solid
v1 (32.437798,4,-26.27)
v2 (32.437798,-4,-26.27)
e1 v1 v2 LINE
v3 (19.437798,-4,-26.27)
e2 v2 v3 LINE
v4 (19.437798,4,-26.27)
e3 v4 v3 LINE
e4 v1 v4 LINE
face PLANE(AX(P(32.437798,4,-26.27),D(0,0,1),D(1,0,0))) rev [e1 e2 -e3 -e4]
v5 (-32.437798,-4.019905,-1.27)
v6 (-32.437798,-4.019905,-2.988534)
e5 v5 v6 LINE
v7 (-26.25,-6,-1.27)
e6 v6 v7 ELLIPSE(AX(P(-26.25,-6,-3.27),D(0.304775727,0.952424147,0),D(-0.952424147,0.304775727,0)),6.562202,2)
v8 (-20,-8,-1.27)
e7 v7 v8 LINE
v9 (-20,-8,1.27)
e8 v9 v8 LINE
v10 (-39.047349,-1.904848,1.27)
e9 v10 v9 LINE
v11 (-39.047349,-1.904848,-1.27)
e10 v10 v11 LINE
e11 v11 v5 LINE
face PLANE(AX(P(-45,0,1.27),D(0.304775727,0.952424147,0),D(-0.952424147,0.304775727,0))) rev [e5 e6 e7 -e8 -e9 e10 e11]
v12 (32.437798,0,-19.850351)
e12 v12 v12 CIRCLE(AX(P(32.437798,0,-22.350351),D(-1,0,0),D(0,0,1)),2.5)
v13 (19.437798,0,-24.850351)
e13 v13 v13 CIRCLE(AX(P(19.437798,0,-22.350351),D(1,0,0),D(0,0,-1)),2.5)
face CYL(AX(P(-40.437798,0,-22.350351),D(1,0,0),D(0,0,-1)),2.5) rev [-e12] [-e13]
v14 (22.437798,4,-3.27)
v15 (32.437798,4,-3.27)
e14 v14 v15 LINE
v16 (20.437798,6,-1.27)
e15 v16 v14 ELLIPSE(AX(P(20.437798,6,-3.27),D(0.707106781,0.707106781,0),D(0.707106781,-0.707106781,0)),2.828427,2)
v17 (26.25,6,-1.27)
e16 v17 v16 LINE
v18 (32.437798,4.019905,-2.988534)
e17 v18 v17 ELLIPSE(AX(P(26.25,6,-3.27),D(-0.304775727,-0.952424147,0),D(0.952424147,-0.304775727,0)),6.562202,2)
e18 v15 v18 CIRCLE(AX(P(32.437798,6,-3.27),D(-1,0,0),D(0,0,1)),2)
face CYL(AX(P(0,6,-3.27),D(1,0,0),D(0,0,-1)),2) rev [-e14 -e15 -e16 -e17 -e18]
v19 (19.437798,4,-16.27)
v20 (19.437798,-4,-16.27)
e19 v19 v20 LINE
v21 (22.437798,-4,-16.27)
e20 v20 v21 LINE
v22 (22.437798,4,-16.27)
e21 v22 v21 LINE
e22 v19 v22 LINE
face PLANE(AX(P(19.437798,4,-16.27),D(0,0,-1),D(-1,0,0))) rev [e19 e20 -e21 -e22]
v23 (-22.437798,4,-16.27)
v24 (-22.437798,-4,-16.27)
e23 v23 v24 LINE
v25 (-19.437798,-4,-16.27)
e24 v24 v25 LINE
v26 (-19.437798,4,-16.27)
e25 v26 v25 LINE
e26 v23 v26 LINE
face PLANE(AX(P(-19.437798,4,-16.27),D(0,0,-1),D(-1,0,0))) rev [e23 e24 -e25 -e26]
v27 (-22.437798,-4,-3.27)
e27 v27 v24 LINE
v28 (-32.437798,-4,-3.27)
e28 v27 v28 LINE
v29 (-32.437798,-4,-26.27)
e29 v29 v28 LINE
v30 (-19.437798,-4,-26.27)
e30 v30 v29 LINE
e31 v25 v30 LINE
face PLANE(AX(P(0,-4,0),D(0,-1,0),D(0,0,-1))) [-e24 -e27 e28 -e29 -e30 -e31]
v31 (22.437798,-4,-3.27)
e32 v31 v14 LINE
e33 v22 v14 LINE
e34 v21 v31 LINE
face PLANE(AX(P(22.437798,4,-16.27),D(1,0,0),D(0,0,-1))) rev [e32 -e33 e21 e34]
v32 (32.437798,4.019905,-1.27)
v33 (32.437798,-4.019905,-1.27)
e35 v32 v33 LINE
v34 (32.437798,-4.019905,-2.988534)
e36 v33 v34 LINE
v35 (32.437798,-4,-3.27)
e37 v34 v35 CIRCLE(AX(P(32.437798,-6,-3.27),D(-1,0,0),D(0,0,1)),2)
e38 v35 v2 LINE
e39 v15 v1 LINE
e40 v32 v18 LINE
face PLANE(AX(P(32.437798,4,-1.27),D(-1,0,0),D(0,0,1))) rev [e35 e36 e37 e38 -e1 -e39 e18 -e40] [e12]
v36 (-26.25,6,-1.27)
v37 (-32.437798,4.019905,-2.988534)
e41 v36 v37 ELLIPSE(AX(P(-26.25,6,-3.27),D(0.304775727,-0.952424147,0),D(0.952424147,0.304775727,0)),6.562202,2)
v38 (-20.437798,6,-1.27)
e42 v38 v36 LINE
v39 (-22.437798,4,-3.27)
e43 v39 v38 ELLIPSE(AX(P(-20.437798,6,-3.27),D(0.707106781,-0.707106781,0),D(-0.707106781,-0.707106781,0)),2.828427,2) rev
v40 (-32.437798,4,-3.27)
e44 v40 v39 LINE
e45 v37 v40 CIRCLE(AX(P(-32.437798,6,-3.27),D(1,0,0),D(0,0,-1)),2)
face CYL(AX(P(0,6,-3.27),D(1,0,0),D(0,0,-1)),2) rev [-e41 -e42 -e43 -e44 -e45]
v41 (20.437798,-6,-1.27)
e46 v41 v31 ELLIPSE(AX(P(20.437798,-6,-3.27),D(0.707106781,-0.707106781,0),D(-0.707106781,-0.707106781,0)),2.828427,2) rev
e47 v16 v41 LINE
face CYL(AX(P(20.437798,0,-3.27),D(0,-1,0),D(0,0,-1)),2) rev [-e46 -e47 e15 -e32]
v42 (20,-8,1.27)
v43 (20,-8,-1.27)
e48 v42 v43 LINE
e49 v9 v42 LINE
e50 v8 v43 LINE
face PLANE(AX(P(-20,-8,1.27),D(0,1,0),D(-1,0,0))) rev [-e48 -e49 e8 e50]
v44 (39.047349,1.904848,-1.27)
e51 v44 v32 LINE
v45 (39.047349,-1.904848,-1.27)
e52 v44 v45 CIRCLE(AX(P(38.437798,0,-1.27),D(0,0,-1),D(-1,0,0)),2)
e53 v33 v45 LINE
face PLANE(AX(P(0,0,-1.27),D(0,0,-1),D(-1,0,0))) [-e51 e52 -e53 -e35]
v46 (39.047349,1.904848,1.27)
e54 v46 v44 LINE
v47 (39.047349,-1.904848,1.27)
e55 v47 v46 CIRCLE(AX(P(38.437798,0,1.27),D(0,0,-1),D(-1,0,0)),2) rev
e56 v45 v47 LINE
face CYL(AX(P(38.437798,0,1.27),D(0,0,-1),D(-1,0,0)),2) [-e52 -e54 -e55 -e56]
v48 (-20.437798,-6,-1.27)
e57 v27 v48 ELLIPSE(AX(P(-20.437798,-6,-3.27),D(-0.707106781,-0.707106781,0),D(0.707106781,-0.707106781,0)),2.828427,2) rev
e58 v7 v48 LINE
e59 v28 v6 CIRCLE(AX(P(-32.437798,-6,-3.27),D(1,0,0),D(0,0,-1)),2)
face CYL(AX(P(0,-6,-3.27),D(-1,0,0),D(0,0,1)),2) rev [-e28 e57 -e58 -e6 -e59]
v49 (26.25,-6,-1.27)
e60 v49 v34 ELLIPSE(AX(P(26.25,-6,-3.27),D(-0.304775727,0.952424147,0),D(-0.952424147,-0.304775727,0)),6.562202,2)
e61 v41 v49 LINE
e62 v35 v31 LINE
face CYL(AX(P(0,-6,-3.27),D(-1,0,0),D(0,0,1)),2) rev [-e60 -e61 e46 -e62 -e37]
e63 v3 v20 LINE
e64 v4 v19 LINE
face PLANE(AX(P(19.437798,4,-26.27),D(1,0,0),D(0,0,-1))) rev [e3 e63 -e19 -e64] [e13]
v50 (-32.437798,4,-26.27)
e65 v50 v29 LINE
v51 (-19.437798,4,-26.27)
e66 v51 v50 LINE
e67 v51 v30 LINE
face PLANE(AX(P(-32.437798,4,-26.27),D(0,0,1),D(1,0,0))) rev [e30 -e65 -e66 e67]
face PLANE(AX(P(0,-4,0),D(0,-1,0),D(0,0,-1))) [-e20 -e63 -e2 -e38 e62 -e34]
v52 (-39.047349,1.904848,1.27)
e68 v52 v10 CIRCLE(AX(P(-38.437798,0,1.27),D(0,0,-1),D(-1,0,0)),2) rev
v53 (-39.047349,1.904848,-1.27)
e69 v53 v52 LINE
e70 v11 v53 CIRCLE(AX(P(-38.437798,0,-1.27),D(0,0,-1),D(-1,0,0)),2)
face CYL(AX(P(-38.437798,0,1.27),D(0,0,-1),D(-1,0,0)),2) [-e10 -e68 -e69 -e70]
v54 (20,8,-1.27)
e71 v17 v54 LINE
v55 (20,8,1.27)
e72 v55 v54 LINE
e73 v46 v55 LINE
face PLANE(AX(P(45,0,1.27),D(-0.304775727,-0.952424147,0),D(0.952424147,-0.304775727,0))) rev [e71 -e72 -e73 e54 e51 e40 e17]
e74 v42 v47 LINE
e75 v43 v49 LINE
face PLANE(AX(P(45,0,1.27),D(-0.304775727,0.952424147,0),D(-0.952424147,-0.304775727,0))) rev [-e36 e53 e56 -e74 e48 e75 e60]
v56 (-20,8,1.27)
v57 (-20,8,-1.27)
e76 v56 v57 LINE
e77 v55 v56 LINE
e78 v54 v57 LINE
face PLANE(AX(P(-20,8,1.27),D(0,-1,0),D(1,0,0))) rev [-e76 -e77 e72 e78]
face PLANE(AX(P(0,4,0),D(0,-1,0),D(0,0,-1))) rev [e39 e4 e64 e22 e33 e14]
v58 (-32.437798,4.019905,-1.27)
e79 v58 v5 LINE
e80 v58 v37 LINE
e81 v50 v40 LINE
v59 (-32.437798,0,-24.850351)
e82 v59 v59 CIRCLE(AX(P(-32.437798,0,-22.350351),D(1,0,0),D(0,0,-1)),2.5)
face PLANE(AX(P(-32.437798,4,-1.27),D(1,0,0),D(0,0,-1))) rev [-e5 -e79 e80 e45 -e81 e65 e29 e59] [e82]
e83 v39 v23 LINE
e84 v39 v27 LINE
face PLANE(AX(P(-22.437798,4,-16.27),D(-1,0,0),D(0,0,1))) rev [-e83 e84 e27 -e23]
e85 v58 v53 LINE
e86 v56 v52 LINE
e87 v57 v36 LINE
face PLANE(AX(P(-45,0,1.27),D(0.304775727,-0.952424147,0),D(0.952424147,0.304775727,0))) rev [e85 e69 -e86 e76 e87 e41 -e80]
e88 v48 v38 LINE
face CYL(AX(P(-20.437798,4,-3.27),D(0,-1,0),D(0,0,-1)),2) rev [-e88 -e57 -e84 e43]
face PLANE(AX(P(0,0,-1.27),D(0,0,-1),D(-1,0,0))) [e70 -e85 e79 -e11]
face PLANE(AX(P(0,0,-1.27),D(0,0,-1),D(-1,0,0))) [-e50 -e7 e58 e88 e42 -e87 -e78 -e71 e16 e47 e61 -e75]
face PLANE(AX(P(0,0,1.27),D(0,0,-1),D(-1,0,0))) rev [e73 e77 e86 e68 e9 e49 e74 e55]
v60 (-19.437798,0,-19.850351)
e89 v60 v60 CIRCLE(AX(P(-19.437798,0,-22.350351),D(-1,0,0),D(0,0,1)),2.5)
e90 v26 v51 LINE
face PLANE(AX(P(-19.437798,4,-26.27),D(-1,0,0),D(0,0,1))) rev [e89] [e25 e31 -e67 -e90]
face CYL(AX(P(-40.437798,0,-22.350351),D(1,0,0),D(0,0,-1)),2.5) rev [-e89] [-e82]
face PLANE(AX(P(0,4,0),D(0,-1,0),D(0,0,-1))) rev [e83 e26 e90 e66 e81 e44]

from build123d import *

# Parameters (mm, degrees)
BOSS_EXTRUDE1_DEPTH     = 1.27
FILLET1_R               = 2
BOSS_EXTRUDE2_DEPTH     = 4
CUT_EXTRUDE1_DEPTH      = 49.880756713
CUT_EXTRUDE1_DEPTH_BACK = 49.880756713
SKETCH3_R               = 2.5
FILLET2_R               = 2


with BuildPart() as part:
    # Sketch1 → Boss-Extrude1 (new, symmetric)
    with BuildSketch(Plane.XY):
        Polygon((-45, 0), (-20, 8), (20, 8), (45, 0), (20, -8), (-20, -8), align=None)
    extrude(amount=BOSS_EXTRUDE1_DEPTH, both=True)

    # Fillet1
    fillet1_edges = [part.edges().sort_by_distance(p)[0] for p in [
        (-45, 0, 0),
        (45, 0, 0),
    ]]
    fillet(fillet1_edges, radius=FILLET1_R)

    # Sketch2 → Boss-Extrude2 (add, symmetric)
    with BuildSketch(Plane(origin=(0, 0, 0), x_dir=(1, 0, 0), z_dir=(0, 1, 0))):
        Polygon((-32.437797626, 1.27), (-32.437797626, 26.27), (-19.437797626, 26.27), (-19.437797626, 16.27), (-22.437797626, 16.27), (-22.437797626, 1.27), align=None)
        Polygon((22.437797626, 16.27), (22.437797626, 1.27), (32.437797626, 1.27), (32.437797626, 26.27), (19.437797626, 26.27), (19.437797626, 16.27), align=None)
    extrude(amount=BOSS_EXTRUDE2_DEPTH, both=True)

    # Sketch3 → Cut-Extrude1 (cut, two sides: drawn at the far end of the back side and taken through both)
    with BuildSketch(Plane(origin=(0, 0, 0), x_dir=(0, 0, -1), z_dir=(1, 0, 0)).offset(-CUT_EXTRUDE1_DEPTH_BACK)):
        with Locations((22.350351111, 0)):
            Circle(SKETCH3_R)
    extrude(amount=CUT_EXTRUDE1_DEPTH + CUT_EXTRUDE1_DEPTH_BACK, mode=Mode.SUBTRACT)

    # Fillet2
    # the kernel refuses this fillet: 2 mm, written as the material it adds along each edge
    with BuildSketch(Plane(origin=(-22.437797626, -4, -1.27), x_dir=(0, -1, 0), z_dir=(-1, 0, 0))) as fillet2_piece_1_section:
        with BuildLine():
            CenterArc((FILLET2_R, -FILLET2_R), FILLET2_R, 90, 90)
            Line((0, -FILLET2_R), (0, 0))
            Line((0, 0), (FILLET2_R, 0))
        make_face()
    fillet2_piece_1 = extrude(amount=10, mode=Mode.PRIVATE)
    fillet2_piece_1 = split(fillet2_piece_1, bisect_by=Plane(origin=(-27.271019309, -5.673273821, -1.76186219), z_dir=(0.3047757271037839, 0.9524241471993241, 0)), keep=Keep.TOP, mode=Mode.PRIVATE)
    add(fillet2_piece_1)
    with BuildSketch(Plane(origin=(-22.437797626, -4, -1.27), x_dir=(1, 0, 0), z_dir=(0, 1, 0))) as fillet2_piece_2:
        with BuildLine():
            CenterArc((FILLET2_R, FILLET2_R), FILLET2_R, 180, 90)
            Line((0, FILLET2_R), (0, 0))
            Line((0, 0), (FILLET2_R, 0))
        make_face()
    extrude(amount=8)
    with BuildSketch(Plane(origin=(-22.437797626, 4, -1.27), x_dir=(0, 1, 0), z_dir=(-1, 0, 0))) as fillet2_piece_3_section:
        with BuildLine():
            CenterArc((FILLET2_R, FILLET2_R), FILLET2_R, 180, 90)
            Line((0, FILLET2_R), (0, 0))
            Line((0, 0), (FILLET2_R, 0))
        make_face()
    fillet2_piece_3 = extrude(amount=10, mode=Mode.PRIVATE)
    fillet2_piece_3 = split(fillet2_piece_3, bisect_by=Plane(origin=(-27.271019309, 5.673273821, -1.76186219), z_dir=(0.3047757271037837, -0.9524241471993242, 0)), keep=Keep.TOP, mode=Mode.PRIVATE)
    add(fillet2_piece_3)
    with BuildSketch(Plane(origin=(22.437797626, -4, -1.27), x_dir=(0, -1, 0), z_dir=(1, 0, 0))) as fillet2_piece_4_section:
        with BuildLine():
            CenterArc((FILLET2_R, FILLET2_R), FILLET2_R, 180, 90)
            Line((0, FILLET2_R), (0, 0))
            Line((0, 0), (FILLET2_R, 0))
        make_face()
    fillet2_piece_4 = extrude(amount=10, mode=Mode.PRIVATE)
    fillet2_piece_4 = split(fillet2_piece_4, bisect_by=Plane(origin=(27.271019309, -5.673273821, -1.76186219), z_dir=(-0.30477572710378414, 0.9524241471993241, 0)), keep=Keep.TOP, mode=Mode.PRIVATE)
    add(fillet2_piece_4)
    with BuildSketch(Plane(origin=(22.437797626, -4, -1.27), x_dir=(-1, 0, 0), z_dir=(0, 1, 0))) as fillet2_piece_5:
        with BuildLine():
            CenterArc((FILLET2_R, -FILLET2_R), FILLET2_R, 90, 90)
            Line((0, -FILLET2_R), (0, 0))
            Line((0, 0), (FILLET2_R, 0))
        make_face()
    extrude(amount=8)
    with BuildSketch(Plane(origin=(22.437797626, 4, -1.27), x_dir=(0, 1, 0), z_dir=(1, 0, 0))) as fillet2_piece_6_section:
        with BuildLine():
            CenterArc((FILLET2_R, -FILLET2_R), FILLET2_R, 90, 90)
            Line((0, -FILLET2_R), (0, 0))
            Line((0, 0), (FILLET2_R, 0))
        make_face()
    fillet2_piece_6 = extrude(amount=10, mode=Mode.PRIVATE)
    fillet2_piece_6 = split(fillet2_piece_6, bisect_by=Plane(origin=(27.271019309, 5.673273821, -1.76186219), z_dir=(-0.30477572710378353, -0.9524241471993244, 0)), keep=Keep.TOP, mode=Mode.PRIVATE)
    add(fillet2_piece_6)
    with BuildSketch(Plane(origin=(-22.437797626, -9, -1.27), x_dir=(1, 0, 0), z_dir=(0, 1, 0))) as fillet2_piece_7a_section:
        with BuildLine():
            CenterArc((FILLET2_R, FILLET2_R), FILLET2_R, 180, 90)
            Line((0, FILLET2_R), (0, 0))
            Line((0, 0), (FILLET2_R, 0))
        make_face()
    fillet2_piece_7a = extrude(amount=13, mode=Mode.PRIVATE)
    fillet2_piece_7a = split(fillet2_piece_7a, bisect_by=Plane(origin=(-22.456507994, -7.213917442, -1.712345443), z_dir=(0.3047757271037839, 0.9524241471993241, 0)), keep=Keep.TOP, mode=Mode.PRIVATE)
    fillet2_piece_7a = split(fillet2_piece_7a, bisect_by=Plane(origin=(-21.967327257, -4, -1.712345443), z_dir=(0, -1, 0)), keep=Keep.TOP, mode=Mode.PRIVATE)
    with BuildSketch(Plane(origin=(-17.437797626, -4, -1.27), x_dir=(0, -1, 0), z_dir=(-1, 0, 0))) as fillet2_piece_7b_section:
        with BuildLine():
            CenterArc((FILLET2_R, -FILLET2_R), FILLET2_R, 90, 90)
            Line((0, -FILLET2_R), (0, 0))
            Line((0, 0), (FILLET2_R, 0))
        make_face()
    fillet2_piece_7b = extrude(amount=15, mode=Mode.PRIVATE)
    fillet2_piece_7b = split(fillet2_piece_7b, bisect_by=Plane(origin=(-22.437797626, -4.452790229, -1.722790229), z_dir=(1, 0, 0)), keep=Keep.TOP, mode=Mode.PRIVATE)
    fillet2_piece_7 = fillet2_piece_7a & fillet2_piece_7b
    add(fillet2_piece_7)
    with BuildSketch(Plane(origin=(-17.437797626, 4, -1.27), x_dir=(0, 1, 0), z_dir=(-1, 0, 0))) as fillet2_piece_8a_section:
        with BuildLine():
            CenterArc((FILLET2_R, FILLET2_R), FILLET2_R, 180, 90)
            Line((0, FILLET2_R), (0, 0))
            Line((0, 0), (FILLET2_R, 0))
        make_face()
    fillet2_piece_8a = extrude(amount=15, mode=Mode.PRIVATE)
    fillet2_piece_8a = split(fillet2_piece_8a, bisect_by=Plane(origin=(-22.437797626, 4.452790229, -1.722790229), z_dir=(1, 0, 0)), keep=Keep.TOP, mode=Mode.PRIVATE)
    with BuildSketch(Plane(origin=(-22.437797626, -4, -1.27), x_dir=(1, 0, 0), z_dir=(0, 1, 0))) as fillet2_piece_8b_section:
        with BuildLine():
            CenterArc((FILLET2_R, FILLET2_R), FILLET2_R, 180, 90)
            Line((0, FILLET2_R), (0, 0))
            Line((0, 0), (FILLET2_R, 0))
        make_face()
    fillet2_piece_8b = extrude(amount=13, mode=Mode.PRIVATE)
    fillet2_piece_8b = split(fillet2_piece_8b, bisect_by=Plane(origin=(-22.456507994, 7.213917442, -1.712345443), z_dir=(0.3047757271037837, -0.9524241471993242, 0)), keep=Keep.TOP, mode=Mode.PRIVATE)
    fillet2_piece_8b = split(fillet2_piece_8b, bisect_by=Plane(origin=(-21.967327257, 4, -1.712345443), z_dir=(0, 1, 0)), keep=Keep.TOP, mode=Mode.PRIVATE)
    fillet2_piece_8 = fillet2_piece_8a & fillet2_piece_8b
    add(fillet2_piece_8)
    with BuildSketch(Plane(origin=(22.437797626, -9, -1.27), x_dir=(-1, 0, 0), z_dir=(0, 1, 0))) as fillet2_piece_9a_section:
        with BuildLine():
            CenterArc((FILLET2_R, -FILLET2_R), FILLET2_R, 90, 90)
            Line((0, -FILLET2_R), (0, 0))
            Line((0, 0), (FILLET2_R, 0))
        make_face()
    fillet2_piece_9a = extrude(amount=13, mode=Mode.PRIVATE)
    fillet2_piece_9a = split(fillet2_piece_9a, bisect_by=Plane(origin=(22.456507994, -7.213917442, -1.712345443), z_dir=(-0.30477572710378414, 0.9524241471993241, 0)), keep=Keep.TOP, mode=Mode.PRIVATE)
    fillet2_piece_9a = split(fillet2_piece_9a, bisect_by=Plane(origin=(21.967327257, -4, -1.712345443), z_dir=(0, -1, 0)), keep=Keep.TOP, mode=Mode.PRIVATE)
    with BuildSketch(Plane(origin=(17.437797626, -4, -1.27), x_dir=(0, -1, 0), z_dir=(1, 0, 0))) as fillet2_piece_9b_section:
        with BuildLine():
            CenterArc((FILLET2_R, FILLET2_R), FILLET2_R, 180, 90)
            Line((0, FILLET2_R), (0, 0))
            Line((0, 0), (FILLET2_R, 0))
        make_face()
    fillet2_piece_9b = extrude(amount=15, mode=Mode.PRIVATE)
    fillet2_piece_9b = split(fillet2_piece_9b, bisect_by=Plane(origin=(22.437797626, -4.452790229, -1.722790229), z_dir=(-1, 0, 0)), keep=Keep.TOP, mode=Mode.PRIVATE)
    fillet2_piece_9 = fillet2_piece_9a & fillet2_piece_9b
    add(fillet2_piece_9)
    with BuildSketch(Plane(origin=(22.437797626, -4, -1.27), x_dir=(-1, 0, 0), z_dir=(0, 1, 0))) as fillet2_piece_10a_section:
        with BuildLine():
            CenterArc((FILLET2_R, -FILLET2_R), FILLET2_R, 90, 90)
            Line((0, -FILLET2_R), (0, 0))
            Line((0, 0), (FILLET2_R, 0))
        make_face()
    fillet2_piece_10a = extrude(amount=13, mode=Mode.PRIVATE)
    fillet2_piece_10a = split(fillet2_piece_10a, bisect_by=Plane(origin=(22.456507994, 7.213917442, -1.712345443), z_dir=(-0.30477572710378353, -0.9524241471993244, 0)), keep=Keep.TOP, mode=Mode.PRIVATE)
    fillet2_piece_10a = split(fillet2_piece_10a, bisect_by=Plane(origin=(21.967327257, 4, -1.712345443), z_dir=(0, 1, 0)), keep=Keep.TOP, mode=Mode.PRIVATE)
    with BuildSketch(Plane(origin=(17.437797626, 4, -1.27), x_dir=(0, 1, 0), z_dir=(1, 0, 0))) as fillet2_piece_10b_section:
        with BuildLine():
            CenterArc((FILLET2_R, -FILLET2_R), FILLET2_R, 90, 90)
            Line((0, -FILLET2_R), (0, 0))
            Line((0, 0), (FILLET2_R, 0))
        make_face()
    fillet2_piece_10b = extrude(amount=15, mode=Mode.PRIVATE)
    fillet2_piece_10b = split(fillet2_piece_10b, bisect_by=Plane(origin=(22.437797626, 4.452790229, -1.722790229), z_dir=(-1, 0, 0)), keep=Keep.TOP, mode=Mode.PRIVATE)
    fillet2_piece_10 = fillet2_piece_10a & fillet2_piece_10b
    add(fillet2_piece_10)


solid = part.part
